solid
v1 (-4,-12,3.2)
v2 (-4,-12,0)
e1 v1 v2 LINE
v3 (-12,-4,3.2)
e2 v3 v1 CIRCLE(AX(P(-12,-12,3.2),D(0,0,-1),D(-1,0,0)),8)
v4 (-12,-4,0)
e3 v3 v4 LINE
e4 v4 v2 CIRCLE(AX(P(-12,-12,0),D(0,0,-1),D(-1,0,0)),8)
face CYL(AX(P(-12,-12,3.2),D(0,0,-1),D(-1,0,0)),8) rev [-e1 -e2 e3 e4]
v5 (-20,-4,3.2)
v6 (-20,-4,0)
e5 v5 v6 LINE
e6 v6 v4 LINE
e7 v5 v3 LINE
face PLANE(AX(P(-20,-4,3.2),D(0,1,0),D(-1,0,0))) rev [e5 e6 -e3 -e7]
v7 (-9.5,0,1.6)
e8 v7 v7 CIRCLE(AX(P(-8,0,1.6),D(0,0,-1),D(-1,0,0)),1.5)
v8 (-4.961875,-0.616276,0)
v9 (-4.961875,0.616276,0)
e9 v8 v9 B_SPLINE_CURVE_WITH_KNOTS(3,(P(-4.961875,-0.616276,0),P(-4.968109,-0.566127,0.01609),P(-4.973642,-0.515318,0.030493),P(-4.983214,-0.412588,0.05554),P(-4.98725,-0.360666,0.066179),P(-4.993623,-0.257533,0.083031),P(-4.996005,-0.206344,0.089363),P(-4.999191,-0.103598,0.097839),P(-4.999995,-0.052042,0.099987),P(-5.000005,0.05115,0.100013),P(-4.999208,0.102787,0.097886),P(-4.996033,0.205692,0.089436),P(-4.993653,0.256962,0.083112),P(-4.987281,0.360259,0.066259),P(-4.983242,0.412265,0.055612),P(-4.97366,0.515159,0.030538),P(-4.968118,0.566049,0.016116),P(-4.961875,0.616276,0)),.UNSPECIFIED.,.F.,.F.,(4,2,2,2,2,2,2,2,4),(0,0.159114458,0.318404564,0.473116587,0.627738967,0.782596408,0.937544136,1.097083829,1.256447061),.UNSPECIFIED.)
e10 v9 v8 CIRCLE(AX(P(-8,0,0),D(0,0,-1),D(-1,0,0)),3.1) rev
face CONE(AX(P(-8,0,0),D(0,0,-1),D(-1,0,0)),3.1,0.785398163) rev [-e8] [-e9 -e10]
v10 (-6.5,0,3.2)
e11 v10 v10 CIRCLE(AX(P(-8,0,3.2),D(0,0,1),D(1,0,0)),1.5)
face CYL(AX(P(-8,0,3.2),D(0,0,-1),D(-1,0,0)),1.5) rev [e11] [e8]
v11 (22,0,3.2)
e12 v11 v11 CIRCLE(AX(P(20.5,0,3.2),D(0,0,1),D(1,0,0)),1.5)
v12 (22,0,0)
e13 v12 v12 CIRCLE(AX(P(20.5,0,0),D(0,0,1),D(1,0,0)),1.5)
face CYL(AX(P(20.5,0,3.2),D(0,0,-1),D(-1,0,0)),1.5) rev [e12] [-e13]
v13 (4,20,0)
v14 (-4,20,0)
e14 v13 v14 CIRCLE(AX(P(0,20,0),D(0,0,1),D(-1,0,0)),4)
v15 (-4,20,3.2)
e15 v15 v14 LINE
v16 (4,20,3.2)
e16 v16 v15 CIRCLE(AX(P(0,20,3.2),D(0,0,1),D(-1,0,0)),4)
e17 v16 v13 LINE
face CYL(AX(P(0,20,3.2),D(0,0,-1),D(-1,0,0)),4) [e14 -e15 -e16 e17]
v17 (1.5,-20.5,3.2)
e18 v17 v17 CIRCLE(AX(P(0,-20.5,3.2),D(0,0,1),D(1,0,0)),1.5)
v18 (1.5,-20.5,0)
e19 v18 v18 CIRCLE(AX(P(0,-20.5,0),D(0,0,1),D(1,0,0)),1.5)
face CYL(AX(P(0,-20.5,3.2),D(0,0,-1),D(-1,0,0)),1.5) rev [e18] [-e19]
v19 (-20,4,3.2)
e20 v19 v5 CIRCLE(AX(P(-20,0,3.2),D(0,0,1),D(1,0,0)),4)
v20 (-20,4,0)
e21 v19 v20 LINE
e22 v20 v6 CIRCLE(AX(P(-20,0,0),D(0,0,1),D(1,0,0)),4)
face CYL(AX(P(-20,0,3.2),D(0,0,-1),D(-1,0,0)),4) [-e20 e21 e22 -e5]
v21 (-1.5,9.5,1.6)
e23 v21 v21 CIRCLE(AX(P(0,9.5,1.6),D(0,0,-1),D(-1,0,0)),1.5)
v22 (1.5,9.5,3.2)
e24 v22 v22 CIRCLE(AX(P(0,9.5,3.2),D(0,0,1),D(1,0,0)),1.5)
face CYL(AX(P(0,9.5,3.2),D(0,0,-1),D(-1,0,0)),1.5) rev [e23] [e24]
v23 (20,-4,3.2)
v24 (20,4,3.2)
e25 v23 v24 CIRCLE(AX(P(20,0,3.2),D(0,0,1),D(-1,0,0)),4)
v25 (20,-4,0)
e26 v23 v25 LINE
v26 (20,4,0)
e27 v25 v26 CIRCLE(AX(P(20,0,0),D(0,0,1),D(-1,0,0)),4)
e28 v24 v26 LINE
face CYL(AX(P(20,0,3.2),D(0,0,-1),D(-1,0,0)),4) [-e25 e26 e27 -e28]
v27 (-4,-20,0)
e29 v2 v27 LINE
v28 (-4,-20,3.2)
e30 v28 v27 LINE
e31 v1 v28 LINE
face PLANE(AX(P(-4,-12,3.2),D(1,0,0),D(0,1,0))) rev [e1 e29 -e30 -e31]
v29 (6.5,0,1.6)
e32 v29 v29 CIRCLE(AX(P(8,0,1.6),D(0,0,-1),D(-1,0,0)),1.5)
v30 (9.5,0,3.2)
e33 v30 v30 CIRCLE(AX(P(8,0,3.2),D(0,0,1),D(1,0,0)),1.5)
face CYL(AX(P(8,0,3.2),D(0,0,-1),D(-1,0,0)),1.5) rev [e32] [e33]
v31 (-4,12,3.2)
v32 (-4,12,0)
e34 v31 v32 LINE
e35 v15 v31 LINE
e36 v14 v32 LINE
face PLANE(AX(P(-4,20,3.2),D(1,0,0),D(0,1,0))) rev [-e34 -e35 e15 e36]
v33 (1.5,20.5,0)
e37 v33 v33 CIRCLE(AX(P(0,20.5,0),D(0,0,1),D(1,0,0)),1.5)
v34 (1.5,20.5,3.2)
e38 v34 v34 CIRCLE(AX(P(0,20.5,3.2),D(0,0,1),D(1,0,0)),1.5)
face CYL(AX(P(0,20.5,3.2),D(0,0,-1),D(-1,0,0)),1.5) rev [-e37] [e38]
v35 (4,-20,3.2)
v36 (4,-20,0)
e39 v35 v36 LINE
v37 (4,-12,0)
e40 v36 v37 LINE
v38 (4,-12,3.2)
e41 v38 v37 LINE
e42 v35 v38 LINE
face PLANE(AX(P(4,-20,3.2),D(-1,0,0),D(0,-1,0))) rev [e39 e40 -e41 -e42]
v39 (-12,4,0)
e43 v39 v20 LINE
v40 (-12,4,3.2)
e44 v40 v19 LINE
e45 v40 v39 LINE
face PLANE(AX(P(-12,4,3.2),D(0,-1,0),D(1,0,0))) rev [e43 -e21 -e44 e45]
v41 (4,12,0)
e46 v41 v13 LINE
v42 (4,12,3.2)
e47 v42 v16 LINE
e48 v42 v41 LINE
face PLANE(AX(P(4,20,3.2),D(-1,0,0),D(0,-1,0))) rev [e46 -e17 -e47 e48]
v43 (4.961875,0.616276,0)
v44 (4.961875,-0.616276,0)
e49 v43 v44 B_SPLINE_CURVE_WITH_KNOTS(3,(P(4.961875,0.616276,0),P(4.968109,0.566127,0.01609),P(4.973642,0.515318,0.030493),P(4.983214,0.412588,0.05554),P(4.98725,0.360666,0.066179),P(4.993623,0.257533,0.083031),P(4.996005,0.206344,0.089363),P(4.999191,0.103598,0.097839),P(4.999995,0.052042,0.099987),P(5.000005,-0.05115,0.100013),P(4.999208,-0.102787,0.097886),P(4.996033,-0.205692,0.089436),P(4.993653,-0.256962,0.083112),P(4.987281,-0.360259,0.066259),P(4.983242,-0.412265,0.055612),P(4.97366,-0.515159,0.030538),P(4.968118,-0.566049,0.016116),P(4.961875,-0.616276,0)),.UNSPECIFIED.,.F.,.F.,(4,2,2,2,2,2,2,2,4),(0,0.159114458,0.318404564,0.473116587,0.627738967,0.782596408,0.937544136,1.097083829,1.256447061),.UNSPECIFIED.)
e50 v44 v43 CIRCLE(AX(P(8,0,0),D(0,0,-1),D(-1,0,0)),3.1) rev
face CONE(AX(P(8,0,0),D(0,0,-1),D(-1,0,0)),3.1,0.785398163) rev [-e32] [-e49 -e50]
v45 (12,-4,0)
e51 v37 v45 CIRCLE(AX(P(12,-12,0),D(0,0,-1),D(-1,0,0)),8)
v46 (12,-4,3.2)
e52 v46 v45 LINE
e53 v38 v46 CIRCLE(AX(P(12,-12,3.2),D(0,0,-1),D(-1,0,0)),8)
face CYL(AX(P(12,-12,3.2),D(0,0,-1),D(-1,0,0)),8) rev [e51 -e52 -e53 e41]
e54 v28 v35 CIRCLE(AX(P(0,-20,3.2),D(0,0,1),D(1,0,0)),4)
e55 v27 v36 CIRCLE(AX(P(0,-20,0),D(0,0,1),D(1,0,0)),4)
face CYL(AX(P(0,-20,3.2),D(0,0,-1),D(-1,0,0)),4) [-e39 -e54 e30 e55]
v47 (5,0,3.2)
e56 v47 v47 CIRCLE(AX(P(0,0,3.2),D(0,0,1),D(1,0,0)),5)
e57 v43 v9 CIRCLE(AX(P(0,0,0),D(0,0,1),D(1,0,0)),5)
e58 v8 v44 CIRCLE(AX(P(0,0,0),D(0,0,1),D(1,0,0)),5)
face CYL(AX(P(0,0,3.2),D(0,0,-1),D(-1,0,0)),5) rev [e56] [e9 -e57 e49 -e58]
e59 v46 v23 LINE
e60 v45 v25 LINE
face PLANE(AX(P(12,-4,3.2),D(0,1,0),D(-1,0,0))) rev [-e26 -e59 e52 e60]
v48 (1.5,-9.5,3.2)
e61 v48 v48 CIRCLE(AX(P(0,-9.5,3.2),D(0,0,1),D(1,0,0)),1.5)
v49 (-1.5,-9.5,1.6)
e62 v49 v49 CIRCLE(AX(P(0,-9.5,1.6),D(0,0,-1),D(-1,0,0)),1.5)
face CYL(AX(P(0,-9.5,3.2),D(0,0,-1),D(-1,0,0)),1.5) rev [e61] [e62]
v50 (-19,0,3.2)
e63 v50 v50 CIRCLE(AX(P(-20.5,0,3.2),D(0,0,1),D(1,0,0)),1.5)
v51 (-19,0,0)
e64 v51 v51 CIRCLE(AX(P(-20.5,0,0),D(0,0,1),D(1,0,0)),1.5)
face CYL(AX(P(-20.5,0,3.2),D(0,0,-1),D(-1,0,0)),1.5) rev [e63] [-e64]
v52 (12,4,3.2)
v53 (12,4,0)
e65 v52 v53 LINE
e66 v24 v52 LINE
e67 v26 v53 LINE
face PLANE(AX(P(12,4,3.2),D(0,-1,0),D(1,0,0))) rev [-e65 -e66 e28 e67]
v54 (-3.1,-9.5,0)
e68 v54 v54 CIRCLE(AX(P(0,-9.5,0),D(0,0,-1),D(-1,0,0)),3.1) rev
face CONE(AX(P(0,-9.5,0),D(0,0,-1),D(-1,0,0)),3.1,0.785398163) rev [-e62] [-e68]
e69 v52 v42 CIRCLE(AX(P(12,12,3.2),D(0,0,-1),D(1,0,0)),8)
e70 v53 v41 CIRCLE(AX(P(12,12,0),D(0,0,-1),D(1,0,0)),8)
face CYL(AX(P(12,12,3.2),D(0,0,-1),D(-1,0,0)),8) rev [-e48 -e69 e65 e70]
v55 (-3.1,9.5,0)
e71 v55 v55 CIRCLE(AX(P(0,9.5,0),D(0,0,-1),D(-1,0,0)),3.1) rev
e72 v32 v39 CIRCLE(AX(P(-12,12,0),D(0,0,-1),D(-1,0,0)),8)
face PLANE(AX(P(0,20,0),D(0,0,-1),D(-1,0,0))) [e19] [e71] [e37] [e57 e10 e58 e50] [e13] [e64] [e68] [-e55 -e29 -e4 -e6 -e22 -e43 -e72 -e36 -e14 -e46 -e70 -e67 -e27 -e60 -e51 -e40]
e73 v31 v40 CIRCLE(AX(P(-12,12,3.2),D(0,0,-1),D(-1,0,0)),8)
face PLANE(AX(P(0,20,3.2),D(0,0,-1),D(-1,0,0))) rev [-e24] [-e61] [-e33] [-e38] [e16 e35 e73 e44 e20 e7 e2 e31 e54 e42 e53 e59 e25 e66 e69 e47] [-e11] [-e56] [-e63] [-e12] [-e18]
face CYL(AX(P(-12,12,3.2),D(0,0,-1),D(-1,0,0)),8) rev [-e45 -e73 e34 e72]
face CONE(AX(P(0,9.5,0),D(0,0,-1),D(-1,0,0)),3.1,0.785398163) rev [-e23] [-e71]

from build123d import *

# Parameters (mm, degrees)
SKETCH_1_R      = 5
SKETCH_1_R_2    = 1.5
EXTRUDE_1_DEPTH = 3.2
CHAMFER_1_SIZE  = 1.6


with BuildPart() as part:
    # Эскиз1 → Бобышка-Вытянуть1 (new body)
    with BuildSketch(Plane.XY):
        with BuildLine():
            Line((-4, 20), (-4, 12))
            ThreePointArc((-4, 12), (-6.343145751, 6.343145751), (-12, 4))
            Line((-12, 4), (-20, 4))
            ThreePointArc((-20, 4), (-24, 0), (-20, -4))
            Line((-20, -4), (-12, -4))
            ThreePointArc((-12, -4), (-6.343145751, -6.343145751), (-4, -12))
            Line((-4, -12), (-4, -20))
            ThreePointArc((-4, -20), (0, -24), (4, -20))
            Line((4, -20), (4, -12))
            ThreePointArc((4, -12), (6.343145751, -6.343145751), (12, -4))
            Line((12, -4), (20, -4))
            ThreePointArc((20, -4), (24, 0), (20, 4))
            Line((20, 4), (12, 4))
            ThreePointArc((12, 4), (6.343145751, 6.343145751), (4, 12))
            Line((4, 12), (4, 20))
            ThreePointArc((4, 20), (0, 24), (-4, 20))
        make_face()
        Circle(SKETCH_1_R, mode=Mode.SUBTRACT)
        with Locations((0, 9.5)):
            Circle(SKETCH_1_R_2, mode=Mode.SUBTRACT)
        with Locations((0, -9.5)):
            Circle(SKETCH_1_R_2, mode=Mode.SUBTRACT)
        with Locations((-8, 0)):
            Circle(SKETCH_1_R_2, mode=Mode.SUBTRACT)
        with Locations((8, 0)):
            Circle(SKETCH_1_R_2, mode=Mode.SUBTRACT)
        with Locations((0, 20.5)):
            Circle(SKETCH_1_R_2, mode=Mode.SUBTRACT)
        with Locations((20.5, 0)):
            Circle(SKETCH_1_R_2, mode=Mode.SUBTRACT)
        with Locations((-20.5, 0)):
            Circle(SKETCH_1_R_2, mode=Mode.SUBTRACT)
        with Locations((0, -20.5)):
            Circle(SKETCH_1_R_2, mode=Mode.SUBTRACT)
    extrude(amount=EXTRUDE_1_DEPTH)

    # Фаска1
    # the kernel refuses this chamfer: 1.6 mm, written as the material it takes off along each edge
    with BuildSketch(Plane(origin=(0, 9.5, 0), x_dir=(1, 0, 0), z_dir=(0, -1, 0))) as chamfer_1_piece_1:
        Polygon((1.5, CHAMFER_1_SIZE), (1.5 + CHAMFER_1_SIZE, 0), (1.5, 0), align=None)
    revolve(axis=Axis((0, 9.5, 0), (0, 0, 1)), mode=Mode.SUBTRACT)
    with BuildSketch(Plane(origin=(0, -9.5, 0), x_dir=(1, 0, 0), z_dir=(0, -1, 0))) as chamfer_1_piece_2:
        Polygon((1.5, CHAMFER_1_SIZE), (1.5 + CHAMFER_1_SIZE, 0), (1.5, 0), align=None)
    revolve(axis=Axis((0, -9.5, 0), (0, 0, 1)), mode=Mode.SUBTRACT)
    with BuildSketch(Plane(origin=(-8, 0, 0), x_dir=(1, 0, 0), z_dir=(0, -1, 0))) as chamfer_1_piece_3:
        Polygon((1.5, CHAMFER_1_SIZE), (1.5 + CHAMFER_1_SIZE, 0), (1.5, 0), align=None)
    revolve(axis=Axis((-8, 0, 0), (0, 0, 1)), mode=Mode.SUBTRACT)
    with BuildSketch(Plane(origin=(8, 0, 0), x_dir=(1, 0, 0), z_dir=(0, -1, 0))) as chamfer_1_piece_4:
        Polygon((1.5, CHAMFER_1_SIZE), (1.5 + CHAMFER_1_SIZE, 0), (1.5, 0), align=None)
    revolve(axis=Axis((8, 0, 0), (0, 0, 1)), mode=Mode.SUBTRACT)


solid = part.part
